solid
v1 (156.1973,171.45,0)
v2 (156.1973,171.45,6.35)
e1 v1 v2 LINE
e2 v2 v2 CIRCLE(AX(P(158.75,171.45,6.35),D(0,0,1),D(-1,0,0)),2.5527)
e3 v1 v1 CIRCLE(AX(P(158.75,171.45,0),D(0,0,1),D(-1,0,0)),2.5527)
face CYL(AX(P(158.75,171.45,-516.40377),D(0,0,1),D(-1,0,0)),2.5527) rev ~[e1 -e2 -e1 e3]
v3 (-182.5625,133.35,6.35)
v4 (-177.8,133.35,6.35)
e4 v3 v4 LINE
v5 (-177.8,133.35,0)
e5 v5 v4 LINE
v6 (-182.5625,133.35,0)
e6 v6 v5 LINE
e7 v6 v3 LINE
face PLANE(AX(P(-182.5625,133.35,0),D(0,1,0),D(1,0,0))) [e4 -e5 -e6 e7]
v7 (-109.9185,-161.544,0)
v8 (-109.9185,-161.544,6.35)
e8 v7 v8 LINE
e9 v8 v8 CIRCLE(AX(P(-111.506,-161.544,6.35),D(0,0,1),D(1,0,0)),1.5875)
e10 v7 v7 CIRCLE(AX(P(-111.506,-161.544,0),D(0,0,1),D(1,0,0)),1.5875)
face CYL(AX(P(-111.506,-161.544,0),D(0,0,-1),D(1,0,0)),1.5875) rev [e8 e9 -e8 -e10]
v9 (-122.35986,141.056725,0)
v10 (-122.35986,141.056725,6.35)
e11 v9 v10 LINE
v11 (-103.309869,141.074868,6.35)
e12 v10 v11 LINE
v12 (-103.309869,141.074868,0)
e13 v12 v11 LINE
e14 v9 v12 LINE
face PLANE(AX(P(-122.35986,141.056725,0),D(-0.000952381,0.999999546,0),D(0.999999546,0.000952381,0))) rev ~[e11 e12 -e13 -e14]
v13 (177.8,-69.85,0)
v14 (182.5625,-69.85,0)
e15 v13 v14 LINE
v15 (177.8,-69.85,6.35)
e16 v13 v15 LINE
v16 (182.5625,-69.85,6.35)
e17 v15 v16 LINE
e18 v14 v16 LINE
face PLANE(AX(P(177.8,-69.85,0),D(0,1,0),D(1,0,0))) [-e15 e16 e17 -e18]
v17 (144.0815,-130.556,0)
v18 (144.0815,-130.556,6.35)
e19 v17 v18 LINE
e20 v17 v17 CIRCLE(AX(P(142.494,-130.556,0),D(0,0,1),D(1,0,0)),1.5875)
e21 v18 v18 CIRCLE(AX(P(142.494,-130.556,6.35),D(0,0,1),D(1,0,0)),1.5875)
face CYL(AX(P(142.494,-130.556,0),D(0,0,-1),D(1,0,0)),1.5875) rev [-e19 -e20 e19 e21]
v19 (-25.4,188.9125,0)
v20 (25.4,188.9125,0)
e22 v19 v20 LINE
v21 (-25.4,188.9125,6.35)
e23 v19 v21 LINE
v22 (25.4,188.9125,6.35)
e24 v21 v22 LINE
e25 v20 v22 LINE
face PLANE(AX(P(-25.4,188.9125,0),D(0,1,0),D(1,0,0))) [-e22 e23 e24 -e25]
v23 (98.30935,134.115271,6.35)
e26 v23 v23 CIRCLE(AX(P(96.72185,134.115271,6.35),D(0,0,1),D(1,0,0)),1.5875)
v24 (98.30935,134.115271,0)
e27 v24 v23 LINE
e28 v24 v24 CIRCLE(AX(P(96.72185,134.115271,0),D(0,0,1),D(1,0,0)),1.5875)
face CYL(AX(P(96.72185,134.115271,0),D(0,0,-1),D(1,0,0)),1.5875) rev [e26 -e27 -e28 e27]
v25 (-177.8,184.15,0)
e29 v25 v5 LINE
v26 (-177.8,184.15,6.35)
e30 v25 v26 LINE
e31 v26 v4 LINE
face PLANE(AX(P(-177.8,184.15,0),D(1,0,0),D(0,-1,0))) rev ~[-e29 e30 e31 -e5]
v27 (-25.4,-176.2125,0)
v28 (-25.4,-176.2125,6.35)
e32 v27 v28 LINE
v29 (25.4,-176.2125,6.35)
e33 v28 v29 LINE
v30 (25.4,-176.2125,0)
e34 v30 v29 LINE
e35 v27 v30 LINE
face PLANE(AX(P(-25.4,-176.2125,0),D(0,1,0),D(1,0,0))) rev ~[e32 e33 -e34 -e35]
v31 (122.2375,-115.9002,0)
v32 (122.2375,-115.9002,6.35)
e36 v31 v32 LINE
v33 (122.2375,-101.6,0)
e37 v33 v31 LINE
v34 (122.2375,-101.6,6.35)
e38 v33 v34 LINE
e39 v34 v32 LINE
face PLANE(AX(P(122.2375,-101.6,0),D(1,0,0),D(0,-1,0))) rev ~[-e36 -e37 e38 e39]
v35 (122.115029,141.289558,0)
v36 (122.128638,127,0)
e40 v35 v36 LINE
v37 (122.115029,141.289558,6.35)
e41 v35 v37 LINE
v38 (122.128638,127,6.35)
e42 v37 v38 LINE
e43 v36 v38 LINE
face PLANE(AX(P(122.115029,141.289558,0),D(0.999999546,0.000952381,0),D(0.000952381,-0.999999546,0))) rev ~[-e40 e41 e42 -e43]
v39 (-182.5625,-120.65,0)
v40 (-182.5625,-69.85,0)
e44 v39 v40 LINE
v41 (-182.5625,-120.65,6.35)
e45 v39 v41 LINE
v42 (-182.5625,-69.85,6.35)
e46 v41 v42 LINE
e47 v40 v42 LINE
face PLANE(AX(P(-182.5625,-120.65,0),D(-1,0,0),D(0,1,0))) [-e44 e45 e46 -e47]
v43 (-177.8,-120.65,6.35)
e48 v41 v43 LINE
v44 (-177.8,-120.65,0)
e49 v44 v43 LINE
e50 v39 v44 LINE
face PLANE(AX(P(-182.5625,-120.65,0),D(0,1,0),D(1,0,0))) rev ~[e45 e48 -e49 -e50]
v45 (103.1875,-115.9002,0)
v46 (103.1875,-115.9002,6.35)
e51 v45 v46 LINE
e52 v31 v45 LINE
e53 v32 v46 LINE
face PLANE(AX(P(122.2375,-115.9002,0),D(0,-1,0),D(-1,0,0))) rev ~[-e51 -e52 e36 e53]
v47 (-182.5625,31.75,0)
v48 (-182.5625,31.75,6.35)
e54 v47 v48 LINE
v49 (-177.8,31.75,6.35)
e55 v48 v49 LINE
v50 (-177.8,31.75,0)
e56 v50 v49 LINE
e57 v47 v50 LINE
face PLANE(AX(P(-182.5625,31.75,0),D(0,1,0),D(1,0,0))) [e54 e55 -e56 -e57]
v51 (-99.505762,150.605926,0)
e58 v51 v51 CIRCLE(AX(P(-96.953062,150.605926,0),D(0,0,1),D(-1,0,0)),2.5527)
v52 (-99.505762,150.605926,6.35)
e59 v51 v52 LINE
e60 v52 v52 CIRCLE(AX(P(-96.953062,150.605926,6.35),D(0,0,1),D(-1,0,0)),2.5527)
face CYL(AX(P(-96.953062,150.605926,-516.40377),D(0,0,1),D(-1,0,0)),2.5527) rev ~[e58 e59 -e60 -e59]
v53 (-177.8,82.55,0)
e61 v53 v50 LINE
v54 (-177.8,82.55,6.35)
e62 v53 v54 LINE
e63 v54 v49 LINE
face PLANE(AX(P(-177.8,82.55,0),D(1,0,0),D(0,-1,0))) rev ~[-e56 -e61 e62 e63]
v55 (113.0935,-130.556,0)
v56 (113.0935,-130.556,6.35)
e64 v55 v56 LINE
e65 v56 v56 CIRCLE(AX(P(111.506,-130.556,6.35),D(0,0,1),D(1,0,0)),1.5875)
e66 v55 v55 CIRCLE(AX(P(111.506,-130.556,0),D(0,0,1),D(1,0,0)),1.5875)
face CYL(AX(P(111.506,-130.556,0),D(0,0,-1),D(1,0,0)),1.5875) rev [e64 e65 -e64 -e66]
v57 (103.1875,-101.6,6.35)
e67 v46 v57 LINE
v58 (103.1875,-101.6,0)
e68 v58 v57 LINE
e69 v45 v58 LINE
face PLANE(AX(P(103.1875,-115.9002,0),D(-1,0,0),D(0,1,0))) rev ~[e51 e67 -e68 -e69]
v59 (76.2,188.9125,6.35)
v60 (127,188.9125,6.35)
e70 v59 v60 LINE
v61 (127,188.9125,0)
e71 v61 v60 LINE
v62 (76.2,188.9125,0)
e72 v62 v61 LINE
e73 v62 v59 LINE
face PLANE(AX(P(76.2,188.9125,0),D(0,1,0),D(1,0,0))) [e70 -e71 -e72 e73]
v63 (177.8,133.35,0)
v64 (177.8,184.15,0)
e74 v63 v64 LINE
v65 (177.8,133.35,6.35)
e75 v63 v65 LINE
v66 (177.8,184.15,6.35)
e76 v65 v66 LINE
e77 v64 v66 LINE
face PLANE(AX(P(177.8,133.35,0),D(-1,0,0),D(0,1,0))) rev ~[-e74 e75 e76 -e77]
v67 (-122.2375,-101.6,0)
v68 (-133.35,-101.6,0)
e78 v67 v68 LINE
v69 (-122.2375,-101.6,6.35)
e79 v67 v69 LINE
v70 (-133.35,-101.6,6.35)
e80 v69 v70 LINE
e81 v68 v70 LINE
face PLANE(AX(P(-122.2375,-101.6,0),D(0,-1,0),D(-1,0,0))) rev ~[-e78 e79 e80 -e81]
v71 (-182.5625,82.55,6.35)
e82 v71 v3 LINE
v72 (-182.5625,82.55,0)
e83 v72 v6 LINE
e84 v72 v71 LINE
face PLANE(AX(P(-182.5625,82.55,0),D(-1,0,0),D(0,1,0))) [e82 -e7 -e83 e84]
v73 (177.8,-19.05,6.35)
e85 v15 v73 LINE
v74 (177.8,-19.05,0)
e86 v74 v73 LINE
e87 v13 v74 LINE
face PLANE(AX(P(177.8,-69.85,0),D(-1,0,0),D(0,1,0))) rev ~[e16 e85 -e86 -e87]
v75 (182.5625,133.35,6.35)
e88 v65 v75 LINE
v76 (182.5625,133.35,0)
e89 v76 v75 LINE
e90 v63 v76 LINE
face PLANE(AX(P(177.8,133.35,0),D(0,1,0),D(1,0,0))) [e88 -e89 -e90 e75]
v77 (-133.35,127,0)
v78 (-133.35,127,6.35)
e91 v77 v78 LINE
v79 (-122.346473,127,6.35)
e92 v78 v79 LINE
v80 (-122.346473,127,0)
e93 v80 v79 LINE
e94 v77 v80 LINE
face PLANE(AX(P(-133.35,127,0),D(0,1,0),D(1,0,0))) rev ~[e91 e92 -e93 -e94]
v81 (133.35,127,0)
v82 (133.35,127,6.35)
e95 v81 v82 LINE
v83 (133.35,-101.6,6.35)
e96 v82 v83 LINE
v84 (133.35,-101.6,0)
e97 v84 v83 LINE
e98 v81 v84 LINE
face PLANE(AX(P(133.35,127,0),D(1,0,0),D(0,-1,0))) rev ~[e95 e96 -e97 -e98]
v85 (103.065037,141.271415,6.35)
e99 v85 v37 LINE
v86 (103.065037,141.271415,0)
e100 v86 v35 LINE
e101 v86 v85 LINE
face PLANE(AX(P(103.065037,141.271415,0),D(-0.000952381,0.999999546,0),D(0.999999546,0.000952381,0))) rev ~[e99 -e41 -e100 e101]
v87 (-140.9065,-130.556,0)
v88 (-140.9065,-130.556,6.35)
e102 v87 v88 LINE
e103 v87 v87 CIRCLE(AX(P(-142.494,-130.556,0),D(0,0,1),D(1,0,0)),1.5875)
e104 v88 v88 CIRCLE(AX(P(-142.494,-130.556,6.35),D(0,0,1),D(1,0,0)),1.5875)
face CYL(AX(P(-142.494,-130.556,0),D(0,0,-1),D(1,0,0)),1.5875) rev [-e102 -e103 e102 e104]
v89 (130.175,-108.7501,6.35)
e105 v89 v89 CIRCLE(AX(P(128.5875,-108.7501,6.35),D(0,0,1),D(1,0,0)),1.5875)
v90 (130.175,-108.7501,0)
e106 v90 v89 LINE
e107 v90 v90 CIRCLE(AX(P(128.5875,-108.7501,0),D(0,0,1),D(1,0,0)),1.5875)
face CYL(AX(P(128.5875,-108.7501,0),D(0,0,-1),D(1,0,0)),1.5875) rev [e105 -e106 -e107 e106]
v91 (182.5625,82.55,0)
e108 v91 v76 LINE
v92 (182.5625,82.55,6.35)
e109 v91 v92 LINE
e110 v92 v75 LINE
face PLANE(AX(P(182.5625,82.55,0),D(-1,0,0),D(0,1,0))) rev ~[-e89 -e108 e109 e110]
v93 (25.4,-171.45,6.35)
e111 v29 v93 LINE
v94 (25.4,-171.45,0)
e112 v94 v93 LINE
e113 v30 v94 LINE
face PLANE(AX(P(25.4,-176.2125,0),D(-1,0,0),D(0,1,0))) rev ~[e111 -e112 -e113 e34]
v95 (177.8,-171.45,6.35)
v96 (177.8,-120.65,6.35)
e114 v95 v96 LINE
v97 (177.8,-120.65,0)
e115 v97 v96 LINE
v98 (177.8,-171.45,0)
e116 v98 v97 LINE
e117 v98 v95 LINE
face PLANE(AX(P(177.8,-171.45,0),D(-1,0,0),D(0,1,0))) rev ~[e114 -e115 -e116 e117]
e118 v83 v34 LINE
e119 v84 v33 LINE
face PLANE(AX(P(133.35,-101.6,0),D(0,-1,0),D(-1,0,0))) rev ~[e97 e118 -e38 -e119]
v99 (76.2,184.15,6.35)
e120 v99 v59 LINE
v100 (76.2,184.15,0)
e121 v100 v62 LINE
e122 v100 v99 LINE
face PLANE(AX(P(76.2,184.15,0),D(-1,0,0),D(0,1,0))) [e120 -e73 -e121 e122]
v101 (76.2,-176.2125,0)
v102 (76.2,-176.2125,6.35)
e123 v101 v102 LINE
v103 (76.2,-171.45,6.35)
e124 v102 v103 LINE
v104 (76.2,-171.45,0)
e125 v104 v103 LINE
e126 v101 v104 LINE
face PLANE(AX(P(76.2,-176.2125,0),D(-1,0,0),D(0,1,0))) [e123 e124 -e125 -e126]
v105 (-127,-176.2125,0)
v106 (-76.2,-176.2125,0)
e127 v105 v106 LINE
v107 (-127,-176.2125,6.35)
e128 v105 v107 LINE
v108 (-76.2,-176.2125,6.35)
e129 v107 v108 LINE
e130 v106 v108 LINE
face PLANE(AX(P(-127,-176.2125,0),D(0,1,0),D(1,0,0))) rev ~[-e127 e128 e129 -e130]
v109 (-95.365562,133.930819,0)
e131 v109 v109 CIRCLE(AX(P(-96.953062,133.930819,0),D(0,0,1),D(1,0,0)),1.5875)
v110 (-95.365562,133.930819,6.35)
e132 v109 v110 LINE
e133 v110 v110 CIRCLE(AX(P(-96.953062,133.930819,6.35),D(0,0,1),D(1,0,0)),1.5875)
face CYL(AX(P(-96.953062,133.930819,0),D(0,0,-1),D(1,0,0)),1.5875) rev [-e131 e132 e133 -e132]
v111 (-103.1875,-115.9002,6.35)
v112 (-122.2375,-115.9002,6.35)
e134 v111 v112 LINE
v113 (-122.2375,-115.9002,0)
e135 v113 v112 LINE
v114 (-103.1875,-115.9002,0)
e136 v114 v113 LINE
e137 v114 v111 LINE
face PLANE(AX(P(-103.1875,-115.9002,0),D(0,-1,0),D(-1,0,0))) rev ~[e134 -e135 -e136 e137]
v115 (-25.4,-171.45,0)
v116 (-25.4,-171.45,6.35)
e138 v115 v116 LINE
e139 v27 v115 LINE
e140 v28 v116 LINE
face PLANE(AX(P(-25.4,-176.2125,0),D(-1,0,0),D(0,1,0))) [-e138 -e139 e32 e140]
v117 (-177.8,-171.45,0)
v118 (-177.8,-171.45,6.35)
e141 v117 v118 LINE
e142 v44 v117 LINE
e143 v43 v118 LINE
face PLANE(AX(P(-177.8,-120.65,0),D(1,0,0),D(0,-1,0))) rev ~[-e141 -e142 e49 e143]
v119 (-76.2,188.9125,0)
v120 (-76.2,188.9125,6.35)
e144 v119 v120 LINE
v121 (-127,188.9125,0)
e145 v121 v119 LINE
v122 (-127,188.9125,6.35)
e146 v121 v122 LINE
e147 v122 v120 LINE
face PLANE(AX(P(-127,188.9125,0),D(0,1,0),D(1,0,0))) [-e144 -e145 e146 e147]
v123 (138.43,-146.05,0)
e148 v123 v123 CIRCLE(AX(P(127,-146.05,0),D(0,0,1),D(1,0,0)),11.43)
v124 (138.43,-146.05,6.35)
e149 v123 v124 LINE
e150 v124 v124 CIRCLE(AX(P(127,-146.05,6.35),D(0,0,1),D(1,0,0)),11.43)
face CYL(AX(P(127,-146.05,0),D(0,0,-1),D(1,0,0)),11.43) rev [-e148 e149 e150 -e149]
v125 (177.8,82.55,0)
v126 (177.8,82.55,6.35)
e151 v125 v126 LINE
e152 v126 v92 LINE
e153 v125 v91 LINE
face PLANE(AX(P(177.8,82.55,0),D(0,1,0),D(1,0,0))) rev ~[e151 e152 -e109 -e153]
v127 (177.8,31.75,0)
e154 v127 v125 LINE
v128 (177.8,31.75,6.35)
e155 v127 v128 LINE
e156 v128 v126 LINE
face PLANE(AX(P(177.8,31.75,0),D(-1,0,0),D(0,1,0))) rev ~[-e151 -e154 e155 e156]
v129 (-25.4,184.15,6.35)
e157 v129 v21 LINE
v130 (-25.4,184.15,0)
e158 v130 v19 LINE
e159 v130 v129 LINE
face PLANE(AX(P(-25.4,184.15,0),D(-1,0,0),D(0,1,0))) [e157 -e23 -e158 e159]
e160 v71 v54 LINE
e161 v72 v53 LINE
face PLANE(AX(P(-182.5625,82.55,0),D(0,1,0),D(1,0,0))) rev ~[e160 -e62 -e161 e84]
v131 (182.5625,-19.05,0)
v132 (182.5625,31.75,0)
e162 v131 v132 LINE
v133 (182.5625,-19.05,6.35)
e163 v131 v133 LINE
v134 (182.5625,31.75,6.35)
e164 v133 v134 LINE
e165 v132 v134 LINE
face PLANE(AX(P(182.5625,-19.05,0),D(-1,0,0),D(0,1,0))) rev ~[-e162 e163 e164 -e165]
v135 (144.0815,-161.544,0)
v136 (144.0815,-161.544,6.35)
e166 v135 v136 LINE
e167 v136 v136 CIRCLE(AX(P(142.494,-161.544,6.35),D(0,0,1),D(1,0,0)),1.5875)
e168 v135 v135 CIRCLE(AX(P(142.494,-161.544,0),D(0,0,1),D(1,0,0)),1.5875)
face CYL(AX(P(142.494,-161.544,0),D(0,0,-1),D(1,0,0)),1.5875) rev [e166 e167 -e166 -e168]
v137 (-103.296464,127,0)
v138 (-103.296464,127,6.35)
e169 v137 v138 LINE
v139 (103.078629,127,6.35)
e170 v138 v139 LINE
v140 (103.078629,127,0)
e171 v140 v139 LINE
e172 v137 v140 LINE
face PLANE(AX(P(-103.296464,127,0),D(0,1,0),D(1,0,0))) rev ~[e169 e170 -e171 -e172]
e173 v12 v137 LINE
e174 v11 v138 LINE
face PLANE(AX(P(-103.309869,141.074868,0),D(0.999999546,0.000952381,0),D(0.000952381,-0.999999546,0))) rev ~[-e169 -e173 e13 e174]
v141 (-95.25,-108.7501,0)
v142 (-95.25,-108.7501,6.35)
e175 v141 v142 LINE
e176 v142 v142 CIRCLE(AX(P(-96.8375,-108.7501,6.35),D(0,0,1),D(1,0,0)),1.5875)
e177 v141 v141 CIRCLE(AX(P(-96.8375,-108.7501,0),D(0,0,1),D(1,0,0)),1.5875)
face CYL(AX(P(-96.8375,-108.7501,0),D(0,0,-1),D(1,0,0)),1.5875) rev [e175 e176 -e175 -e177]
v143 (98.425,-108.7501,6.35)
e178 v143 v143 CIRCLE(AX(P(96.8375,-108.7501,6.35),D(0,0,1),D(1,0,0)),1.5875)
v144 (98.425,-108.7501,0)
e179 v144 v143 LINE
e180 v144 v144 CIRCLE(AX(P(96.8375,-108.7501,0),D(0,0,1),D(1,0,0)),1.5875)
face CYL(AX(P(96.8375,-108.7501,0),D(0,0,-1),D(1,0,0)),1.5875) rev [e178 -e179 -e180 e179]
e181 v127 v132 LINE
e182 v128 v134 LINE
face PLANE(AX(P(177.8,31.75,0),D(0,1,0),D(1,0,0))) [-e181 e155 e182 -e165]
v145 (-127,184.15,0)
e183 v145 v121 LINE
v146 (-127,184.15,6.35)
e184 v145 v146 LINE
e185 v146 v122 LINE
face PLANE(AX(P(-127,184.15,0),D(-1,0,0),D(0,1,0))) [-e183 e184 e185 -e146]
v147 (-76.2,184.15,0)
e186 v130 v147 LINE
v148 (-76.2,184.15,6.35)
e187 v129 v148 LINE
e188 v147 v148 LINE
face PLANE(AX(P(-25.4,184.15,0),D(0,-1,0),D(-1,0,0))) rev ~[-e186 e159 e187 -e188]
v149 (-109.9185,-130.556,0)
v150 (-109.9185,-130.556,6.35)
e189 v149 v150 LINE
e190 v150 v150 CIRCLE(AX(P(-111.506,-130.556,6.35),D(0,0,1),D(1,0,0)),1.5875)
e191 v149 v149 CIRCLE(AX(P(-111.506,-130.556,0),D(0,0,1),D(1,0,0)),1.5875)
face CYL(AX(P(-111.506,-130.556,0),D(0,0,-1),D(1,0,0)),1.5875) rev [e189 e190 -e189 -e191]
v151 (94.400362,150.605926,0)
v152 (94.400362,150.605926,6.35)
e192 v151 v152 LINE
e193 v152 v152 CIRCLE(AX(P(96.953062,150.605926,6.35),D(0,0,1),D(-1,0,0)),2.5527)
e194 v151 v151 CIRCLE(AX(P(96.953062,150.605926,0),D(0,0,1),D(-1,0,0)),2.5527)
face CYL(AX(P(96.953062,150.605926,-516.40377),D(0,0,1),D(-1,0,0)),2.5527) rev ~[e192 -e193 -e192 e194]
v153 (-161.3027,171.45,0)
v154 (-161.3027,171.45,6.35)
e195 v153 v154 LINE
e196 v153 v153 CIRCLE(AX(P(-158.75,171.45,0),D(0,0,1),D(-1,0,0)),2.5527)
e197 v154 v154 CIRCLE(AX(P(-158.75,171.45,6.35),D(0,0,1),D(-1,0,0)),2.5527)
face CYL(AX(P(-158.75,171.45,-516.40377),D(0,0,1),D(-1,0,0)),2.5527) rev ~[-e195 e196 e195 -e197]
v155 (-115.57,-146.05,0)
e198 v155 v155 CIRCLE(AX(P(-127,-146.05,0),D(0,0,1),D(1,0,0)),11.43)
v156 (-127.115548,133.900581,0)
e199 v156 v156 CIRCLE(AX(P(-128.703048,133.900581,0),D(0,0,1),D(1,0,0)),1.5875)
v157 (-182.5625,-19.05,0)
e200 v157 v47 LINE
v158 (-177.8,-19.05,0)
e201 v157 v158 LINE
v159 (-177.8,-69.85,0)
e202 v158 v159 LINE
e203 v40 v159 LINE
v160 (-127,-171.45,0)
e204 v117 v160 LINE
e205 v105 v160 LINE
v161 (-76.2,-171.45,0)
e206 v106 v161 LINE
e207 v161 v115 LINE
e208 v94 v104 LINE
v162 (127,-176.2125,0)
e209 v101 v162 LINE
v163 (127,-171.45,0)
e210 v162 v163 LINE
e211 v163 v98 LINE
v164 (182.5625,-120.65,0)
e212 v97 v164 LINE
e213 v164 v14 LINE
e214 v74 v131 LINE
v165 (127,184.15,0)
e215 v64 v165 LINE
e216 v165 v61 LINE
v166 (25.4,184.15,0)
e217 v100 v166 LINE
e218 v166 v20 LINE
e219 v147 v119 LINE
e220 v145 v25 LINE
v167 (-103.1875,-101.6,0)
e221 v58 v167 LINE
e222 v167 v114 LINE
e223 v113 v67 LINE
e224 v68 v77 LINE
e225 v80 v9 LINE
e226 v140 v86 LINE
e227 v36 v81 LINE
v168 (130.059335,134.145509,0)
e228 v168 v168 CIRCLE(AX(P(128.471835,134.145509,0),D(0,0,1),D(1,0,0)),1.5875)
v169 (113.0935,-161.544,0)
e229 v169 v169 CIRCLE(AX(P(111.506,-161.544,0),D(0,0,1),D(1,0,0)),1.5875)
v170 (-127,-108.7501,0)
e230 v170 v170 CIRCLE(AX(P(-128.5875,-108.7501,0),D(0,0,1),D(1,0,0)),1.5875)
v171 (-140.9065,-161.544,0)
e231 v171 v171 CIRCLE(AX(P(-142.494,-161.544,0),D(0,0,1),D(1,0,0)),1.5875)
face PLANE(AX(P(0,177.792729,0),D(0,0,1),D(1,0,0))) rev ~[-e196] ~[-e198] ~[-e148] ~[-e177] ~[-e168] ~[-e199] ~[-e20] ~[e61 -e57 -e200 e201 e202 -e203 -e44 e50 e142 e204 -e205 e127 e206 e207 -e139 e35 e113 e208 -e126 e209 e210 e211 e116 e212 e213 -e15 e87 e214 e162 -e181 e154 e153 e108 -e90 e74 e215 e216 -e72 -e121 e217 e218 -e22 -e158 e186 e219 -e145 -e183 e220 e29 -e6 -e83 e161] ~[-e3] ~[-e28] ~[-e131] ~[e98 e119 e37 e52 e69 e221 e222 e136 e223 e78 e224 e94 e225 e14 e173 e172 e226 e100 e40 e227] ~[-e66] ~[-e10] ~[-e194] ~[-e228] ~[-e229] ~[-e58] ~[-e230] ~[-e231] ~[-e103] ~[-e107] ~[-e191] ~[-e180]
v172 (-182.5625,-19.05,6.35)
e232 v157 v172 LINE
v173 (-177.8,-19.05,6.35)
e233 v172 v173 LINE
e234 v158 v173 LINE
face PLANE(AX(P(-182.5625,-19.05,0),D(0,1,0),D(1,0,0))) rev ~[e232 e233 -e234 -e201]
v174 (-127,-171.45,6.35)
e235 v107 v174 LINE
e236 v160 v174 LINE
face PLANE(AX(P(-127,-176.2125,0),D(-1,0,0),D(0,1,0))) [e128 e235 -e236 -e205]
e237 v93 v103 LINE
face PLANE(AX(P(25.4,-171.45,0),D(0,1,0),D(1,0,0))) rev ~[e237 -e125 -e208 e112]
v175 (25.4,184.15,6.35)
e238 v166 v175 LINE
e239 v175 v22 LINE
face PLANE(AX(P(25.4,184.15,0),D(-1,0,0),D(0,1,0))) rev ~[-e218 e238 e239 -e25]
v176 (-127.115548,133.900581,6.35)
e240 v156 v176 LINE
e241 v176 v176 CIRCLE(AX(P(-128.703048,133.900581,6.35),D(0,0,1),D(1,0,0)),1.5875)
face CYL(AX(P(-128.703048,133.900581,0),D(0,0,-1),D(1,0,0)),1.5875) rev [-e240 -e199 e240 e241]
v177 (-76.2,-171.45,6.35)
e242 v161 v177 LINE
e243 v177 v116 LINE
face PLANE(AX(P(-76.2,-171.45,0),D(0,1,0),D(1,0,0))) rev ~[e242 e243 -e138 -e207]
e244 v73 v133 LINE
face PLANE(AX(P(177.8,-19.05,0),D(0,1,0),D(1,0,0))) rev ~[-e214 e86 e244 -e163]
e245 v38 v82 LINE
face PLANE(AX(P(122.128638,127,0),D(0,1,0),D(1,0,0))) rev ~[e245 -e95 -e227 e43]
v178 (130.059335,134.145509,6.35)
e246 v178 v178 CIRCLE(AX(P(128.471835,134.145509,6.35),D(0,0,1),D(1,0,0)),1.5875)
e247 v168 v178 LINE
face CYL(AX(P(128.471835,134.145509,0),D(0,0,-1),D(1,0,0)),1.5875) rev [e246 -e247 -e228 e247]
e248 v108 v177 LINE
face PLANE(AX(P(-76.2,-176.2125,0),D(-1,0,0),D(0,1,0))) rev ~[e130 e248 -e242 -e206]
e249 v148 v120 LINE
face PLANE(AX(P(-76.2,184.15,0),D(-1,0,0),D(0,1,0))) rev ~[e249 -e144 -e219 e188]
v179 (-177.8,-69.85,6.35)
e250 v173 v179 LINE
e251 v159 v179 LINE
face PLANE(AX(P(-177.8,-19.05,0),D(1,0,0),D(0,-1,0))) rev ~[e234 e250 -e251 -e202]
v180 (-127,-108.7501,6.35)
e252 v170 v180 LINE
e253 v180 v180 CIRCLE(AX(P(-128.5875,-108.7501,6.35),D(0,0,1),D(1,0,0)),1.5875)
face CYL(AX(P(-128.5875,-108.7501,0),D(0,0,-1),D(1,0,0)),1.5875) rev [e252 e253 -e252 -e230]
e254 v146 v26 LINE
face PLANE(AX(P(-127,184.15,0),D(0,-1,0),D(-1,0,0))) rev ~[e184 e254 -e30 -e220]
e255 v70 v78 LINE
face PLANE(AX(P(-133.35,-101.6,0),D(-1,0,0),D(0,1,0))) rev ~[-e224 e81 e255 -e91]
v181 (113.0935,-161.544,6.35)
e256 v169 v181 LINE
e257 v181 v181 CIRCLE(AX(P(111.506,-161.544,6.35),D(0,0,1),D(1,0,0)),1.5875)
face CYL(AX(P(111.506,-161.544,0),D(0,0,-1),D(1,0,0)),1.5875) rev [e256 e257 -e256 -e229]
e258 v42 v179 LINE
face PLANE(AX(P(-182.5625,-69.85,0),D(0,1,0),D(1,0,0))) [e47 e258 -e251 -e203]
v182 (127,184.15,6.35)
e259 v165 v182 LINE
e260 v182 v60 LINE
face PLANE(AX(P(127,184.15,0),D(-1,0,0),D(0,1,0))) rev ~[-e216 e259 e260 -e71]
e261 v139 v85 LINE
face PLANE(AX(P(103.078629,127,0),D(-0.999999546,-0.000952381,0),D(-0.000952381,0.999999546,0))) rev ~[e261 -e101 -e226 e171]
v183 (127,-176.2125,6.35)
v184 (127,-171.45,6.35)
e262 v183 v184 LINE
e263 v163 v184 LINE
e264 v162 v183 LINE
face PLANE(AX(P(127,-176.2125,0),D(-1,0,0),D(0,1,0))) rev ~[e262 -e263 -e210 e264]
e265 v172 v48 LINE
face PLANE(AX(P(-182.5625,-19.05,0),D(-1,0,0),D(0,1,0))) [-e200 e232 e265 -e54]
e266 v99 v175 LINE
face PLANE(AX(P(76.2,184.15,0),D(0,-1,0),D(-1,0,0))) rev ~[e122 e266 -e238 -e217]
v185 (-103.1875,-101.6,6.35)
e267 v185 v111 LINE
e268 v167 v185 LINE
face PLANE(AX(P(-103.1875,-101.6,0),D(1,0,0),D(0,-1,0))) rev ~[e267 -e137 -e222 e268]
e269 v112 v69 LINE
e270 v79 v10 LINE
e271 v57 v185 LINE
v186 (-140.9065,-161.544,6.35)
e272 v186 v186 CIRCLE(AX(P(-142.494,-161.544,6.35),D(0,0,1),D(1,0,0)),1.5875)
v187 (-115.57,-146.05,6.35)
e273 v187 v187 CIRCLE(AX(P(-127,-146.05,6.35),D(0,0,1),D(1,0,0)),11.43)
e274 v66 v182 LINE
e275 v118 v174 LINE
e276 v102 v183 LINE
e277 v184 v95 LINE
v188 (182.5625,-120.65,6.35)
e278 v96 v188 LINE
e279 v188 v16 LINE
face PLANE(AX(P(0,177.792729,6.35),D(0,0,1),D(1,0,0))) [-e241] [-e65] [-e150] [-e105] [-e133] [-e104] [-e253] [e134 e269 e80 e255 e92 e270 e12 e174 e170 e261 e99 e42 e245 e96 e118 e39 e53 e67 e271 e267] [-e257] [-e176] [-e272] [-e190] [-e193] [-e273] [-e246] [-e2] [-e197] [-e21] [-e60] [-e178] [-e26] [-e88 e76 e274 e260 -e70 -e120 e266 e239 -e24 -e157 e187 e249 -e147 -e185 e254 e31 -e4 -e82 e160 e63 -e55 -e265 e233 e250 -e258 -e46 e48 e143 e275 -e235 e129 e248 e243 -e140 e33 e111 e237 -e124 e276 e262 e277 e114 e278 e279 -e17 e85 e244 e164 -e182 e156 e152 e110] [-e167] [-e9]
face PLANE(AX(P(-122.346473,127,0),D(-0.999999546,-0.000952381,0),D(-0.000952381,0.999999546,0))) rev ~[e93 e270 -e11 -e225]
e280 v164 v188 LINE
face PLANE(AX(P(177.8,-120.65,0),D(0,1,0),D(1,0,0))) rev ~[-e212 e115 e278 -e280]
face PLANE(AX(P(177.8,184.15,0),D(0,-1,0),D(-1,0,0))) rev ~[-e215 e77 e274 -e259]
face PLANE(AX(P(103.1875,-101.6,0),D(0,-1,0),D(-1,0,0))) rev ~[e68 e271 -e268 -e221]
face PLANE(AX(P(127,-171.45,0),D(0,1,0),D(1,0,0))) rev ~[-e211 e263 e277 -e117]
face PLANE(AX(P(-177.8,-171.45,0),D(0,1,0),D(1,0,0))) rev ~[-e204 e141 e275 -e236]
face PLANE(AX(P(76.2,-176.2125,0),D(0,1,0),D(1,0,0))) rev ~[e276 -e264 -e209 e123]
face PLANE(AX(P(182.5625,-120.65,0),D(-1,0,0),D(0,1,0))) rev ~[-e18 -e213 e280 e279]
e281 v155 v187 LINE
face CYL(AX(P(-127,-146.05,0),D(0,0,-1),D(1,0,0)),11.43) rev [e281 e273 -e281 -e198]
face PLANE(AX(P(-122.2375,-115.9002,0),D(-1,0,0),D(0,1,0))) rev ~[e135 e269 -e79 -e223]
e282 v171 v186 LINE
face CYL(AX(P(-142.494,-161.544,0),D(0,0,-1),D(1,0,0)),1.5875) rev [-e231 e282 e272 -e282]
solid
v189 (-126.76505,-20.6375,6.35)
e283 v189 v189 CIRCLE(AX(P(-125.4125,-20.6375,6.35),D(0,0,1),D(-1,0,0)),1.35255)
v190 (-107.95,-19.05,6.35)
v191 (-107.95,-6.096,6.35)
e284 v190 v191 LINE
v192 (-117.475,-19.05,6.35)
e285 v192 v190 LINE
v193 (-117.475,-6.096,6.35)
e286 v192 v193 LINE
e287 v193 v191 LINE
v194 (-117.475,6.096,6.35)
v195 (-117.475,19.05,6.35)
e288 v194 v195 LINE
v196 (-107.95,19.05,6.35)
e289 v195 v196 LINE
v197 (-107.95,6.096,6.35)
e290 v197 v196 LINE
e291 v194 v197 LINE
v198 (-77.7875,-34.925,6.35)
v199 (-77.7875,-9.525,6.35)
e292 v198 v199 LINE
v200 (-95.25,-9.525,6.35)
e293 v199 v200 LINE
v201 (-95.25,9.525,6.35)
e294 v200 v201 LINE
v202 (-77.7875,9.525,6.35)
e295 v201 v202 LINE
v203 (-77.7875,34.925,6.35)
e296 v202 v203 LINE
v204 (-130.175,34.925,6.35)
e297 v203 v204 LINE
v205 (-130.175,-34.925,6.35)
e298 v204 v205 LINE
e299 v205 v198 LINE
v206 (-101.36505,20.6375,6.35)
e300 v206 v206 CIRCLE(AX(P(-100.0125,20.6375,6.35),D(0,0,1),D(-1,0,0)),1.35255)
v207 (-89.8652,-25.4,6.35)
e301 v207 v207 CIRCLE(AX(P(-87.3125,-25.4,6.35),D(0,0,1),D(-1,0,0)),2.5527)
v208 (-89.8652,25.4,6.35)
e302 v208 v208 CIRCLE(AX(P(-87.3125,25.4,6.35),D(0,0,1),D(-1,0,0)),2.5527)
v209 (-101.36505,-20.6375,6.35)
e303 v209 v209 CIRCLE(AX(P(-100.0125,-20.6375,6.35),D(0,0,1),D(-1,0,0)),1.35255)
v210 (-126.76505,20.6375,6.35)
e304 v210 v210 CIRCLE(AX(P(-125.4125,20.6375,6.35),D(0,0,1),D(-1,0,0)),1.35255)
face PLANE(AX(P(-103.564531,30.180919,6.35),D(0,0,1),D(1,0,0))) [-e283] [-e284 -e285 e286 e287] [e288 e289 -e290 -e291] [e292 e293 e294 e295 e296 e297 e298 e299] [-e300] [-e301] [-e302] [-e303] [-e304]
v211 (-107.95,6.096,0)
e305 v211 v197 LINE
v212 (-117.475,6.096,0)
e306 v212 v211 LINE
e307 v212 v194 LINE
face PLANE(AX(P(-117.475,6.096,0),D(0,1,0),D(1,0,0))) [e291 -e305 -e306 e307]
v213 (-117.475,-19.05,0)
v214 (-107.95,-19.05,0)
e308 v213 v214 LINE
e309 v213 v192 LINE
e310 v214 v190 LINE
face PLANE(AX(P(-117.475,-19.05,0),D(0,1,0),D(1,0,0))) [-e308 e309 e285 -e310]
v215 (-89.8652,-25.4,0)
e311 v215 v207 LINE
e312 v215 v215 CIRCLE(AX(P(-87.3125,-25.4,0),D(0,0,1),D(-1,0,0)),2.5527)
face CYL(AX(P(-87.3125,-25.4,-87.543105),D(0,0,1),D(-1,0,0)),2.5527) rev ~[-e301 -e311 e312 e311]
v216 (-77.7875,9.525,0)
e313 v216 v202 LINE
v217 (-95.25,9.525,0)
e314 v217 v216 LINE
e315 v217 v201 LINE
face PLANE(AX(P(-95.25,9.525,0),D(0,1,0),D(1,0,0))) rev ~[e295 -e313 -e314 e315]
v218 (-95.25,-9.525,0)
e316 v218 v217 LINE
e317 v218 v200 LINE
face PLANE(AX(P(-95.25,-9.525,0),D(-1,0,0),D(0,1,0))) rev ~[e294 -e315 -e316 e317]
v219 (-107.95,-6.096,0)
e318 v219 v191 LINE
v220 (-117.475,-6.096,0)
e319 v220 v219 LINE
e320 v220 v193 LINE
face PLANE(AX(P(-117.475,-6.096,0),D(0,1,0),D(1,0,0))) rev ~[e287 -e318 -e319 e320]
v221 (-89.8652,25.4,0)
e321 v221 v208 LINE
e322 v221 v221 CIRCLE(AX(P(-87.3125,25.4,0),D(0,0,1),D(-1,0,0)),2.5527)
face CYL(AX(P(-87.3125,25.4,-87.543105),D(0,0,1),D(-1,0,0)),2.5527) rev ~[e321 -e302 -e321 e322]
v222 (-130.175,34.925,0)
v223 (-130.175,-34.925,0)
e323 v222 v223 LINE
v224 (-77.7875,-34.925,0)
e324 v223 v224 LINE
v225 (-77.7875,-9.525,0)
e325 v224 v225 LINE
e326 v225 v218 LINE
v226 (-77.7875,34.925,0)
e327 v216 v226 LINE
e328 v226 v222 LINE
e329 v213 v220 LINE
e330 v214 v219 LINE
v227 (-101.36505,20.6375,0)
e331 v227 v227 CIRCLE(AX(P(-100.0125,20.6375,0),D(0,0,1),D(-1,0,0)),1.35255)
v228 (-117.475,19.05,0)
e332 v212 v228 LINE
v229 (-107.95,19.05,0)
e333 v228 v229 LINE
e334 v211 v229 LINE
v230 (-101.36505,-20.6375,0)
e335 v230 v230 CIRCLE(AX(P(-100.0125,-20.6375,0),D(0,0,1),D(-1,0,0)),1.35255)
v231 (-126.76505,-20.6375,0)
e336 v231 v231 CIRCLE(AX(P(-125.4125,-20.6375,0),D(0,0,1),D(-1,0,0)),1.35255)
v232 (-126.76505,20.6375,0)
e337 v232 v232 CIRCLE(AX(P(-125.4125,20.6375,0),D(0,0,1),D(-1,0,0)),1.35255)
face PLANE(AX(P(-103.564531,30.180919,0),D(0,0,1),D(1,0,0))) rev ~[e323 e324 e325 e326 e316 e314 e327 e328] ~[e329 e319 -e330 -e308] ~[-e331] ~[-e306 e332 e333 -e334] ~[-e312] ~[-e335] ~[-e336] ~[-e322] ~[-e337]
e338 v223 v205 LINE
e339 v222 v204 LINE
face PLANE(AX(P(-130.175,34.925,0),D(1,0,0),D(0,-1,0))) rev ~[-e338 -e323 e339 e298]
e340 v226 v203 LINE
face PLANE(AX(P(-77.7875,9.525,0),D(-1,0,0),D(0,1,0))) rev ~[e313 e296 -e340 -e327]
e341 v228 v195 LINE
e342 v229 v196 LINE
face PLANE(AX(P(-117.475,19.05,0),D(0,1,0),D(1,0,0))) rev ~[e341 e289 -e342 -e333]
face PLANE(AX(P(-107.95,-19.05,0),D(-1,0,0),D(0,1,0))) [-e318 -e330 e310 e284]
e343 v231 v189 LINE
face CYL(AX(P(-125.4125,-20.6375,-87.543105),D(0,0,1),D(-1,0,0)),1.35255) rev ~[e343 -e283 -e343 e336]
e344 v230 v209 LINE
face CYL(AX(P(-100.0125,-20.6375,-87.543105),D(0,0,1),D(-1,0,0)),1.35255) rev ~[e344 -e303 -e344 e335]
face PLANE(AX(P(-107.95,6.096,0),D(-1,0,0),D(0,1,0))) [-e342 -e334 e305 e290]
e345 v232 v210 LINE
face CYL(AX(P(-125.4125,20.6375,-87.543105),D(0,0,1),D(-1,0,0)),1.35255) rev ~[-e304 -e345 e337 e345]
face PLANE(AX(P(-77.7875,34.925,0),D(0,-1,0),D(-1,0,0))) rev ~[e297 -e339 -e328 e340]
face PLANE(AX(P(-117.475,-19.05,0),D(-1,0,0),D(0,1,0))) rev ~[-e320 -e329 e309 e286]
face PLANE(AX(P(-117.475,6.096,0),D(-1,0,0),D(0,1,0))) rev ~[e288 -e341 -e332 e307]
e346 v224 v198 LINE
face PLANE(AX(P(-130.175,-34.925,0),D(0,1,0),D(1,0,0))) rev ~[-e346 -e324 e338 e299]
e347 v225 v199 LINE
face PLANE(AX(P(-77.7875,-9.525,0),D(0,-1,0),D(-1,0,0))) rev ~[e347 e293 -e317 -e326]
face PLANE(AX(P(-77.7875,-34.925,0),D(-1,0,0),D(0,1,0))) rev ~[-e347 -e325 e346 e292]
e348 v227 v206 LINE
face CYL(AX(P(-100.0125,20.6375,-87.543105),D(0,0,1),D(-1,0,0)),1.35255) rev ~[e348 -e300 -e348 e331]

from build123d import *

# Parameters (mm, degrees)
F0_R     = 1.5875
F0_R_2   = 11.43
F0_R_3   = 3.175
F0_W     = 4.7625
F0_H     = 50.8
F0_W_2   = 50.8
F0_H_2   = 4.7625
F0_W_3   = 44.45
F0_H_3   = 41.1268851364
F1_DEPTH = 6.35
F0_R_4   = 1.8415
F0_W_4   = 9.525
F0_H_4   = 12.954
F2_D     = 2.7051
F3_D     = 5.1054
F4_D     = 5.1054


with BuildPart() as f1:
    # F0 (on Top) → F1 (new body)
    with BuildSketch(Plane.XY):
        with BuildLine():
            ThreePointArc((155.575, 171.45), (158.75, 174.625), (161.925, 171.45))
            Line((161.925, 171.45), (177.8, 171.45))
            Line((177.8, 171.45), (177.8, 184.15))
            Line((177.8, 184.15), (127, 184.15))
            Line((127, 184.15), (76.2, 184.15))
            Line((76.2, 184.15), (25.4, 184.15))
            Line((25.4, 184.15), (-25.4, 184.15))
            Line((-25.4, 184.15), (-76.2, 184.15))
            Line((-76.2, 184.15), (-127, 184.15))
            Line((-127, 184.15), (-177.8, 184.15))
            Line((-177.8, 184.15), (-177.8, 171.45))
            Line((-177.8, 171.45), (-161.925, 171.45))
            ThreePointArc((-161.925, 171.45), (-158.75, 174.625), (-155.575, 171.45))
            Line((-155.575, 171.45), (155.575, 171.45))
        make_face()
        with BuildLine():
            ThreePointArc((155.575, 171.45), (158.75, 168.275), (161.925, 171.45))
            Line((161.925, 171.45), (155.575, 171.45))
        make_face()
        with BuildLine():
            Line((155.575, 171.45), (161.925, 171.45))
            ThreePointArc((161.925, 171.45), (158.75, 174.625), (155.575, 171.45))
        make_face()
        with BuildLine():
            Line((177.8, 171.45), (161.925, 171.45))
            ThreePointArc((161.925, 171.45), (158.75, 168.275), (155.575, 171.45))
            Line((155.575, 171.45), (-155.575, 171.45))
            ThreePointArc((-155.575, 171.45), (-158.75, 168.275), (-161.925, 171.45))
            Line((-161.925, 171.45), (-177.8, 171.45))
            Line((-177.8, 171.45), (-177.8, 133.35))
            Line((-177.8, 133.35), (-177.8, 82.55))
            Line((-177.8, 82.55), (-177.8, 31.75))
            Line((-177.8, 31.75), (-177.8, -19.05))
            Line((-177.8, -19.05), (-177.8, -69.85))
            Line((-177.8, -69.85), (-177.8, -120.65))
            Line((-177.8, -120.65), (-177.8, -171.45))
            Line((-177.8, -171.45), (-127, -171.45))
            Line((-127, -171.45), (-76.2, -171.45))
            Line((-76.2, -171.45), (-25.4, -171.45))
            Line((-25.4, -171.45), (25.4, -171.45))
            Line((25.4, -171.45), (76.2, -171.45))
            Line((76.2, -171.45), (127, -171.45))
            Line((127, -171.45), (177.8, -171.45))
            Line((177.8, -171.45), (177.8, -120.65))
            Line((177.8, -120.65), (177.8, -69.85))
            Line((177.8, -69.85), (177.8, -19.05))
            Line((177.8, -19.05), (177.8, 31.75))
            Line((177.8, 31.75), (177.8, 82.55))
            Line((177.8, 82.55), (177.8, 133.35))
            Line((177.8, 133.35), (177.8, 171.45))
        make_face()
        with Locations((-142.494, -161.544)):
            Circle(F0_R, mode=Mode.SUBTRACT)
        with Locations((-111.506, -161.544)):
            Circle(F0_R, mode=Mode.SUBTRACT)
        with Locations((-127, -146.05)):
            Circle(F0_R_2, mode=Mode.SUBTRACT)
        with Locations((-142.494, -130.556)):
            Circle(F0_R, mode=Mode.SUBTRACT)
        with Locations((-128.5875, -108.7501)):
            Circle(F0_R, mode=Mode.SUBTRACT)
        with Locations((-111.506, -130.556)):
            Circle(F0_R, mode=Mode.SUBTRACT)
        with Locations((-96.8375, -108.7501)):
            Circle(F0_R, mode=Mode.SUBTRACT)
        with Locations((111.506, -161.544)):
            Circle(F0_R, mode=Mode.SUBTRACT)
        with Locations((127, -146.05)):
            Circle(F0_R_2, mode=Mode.SUBTRACT)
        with Locations((142.494, -161.544)):
            Circle(F0_R, mode=Mode.SUBTRACT)
        with Locations((111.506, -130.556)):
            Circle(F0_R, mode=Mode.SUBTRACT)
        with Locations((96.8375, -108.7501)):
            Circle(F0_R, mode=Mode.SUBTRACT)
        with Locations((128.5875, -108.7501)):
            Circle(F0_R, mode=Mode.SUBTRACT)
        with Locations((142.494, -130.556)):
            Circle(F0_R, mode=Mode.SUBTRACT)
        with Locations((-128.7030479432, 133.9005806915)):
            Circle(F0_R, mode=Mode.SUBTRACT)
        with Locations((-96.9530623423, 133.9308187798)):
            Circle(F0_R, mode=Mode.SUBTRACT)
        with Locations((-96.9530623423, 150.6059263422)):
            Circle(F0_R_3, mode=Mode.SUBTRACT)
        Polygon((-122.2375, -101.6), (-133.35, -101.6), (-133.35, 126.7460517791), (-133.35, 127), (-122.3464730803, 127), (-122.3598604405, 141.0567250665), (-103.30986908, 141.0748679195), (-103.2964644408, 127), (-22.225, 127), (-22.225, 168.1268851364), (22.225, 168.1268851364), (22.225, 127), (103.0786291533, 127), (103.065037326, 141.271415494), (122.1150286865, 141.289558347), (122.1286377928, 127), (133.2411428818, 127), (133.35, 127), (133.35, -101.6), (122.2375, -101.6), (122.2375, -115.9002), (103.1875, -115.9002), (103.1875, -101.6), (-103.1875, -101.6), (-103.1875, -115.9002), (-122.2375, -115.9002), align=None, mode=Mode.SUBTRACT)
        with Locations((96.7218498233, 134.115271119)):
            Circle(F0_R, mode=Mode.SUBTRACT)
        with Locations((128.4718354242, 134.1455092073)):
            Circle(F0_R, mode=Mode.SUBTRACT)
        with Locations((96.9530623423, 150.6059263422)):
            Circle(F0_R_3, mode=Mode.SUBTRACT)
        with Locations((180.18125, 107.95)):
            Rectangle(F0_W, F0_H)
        with BuildLine():
            ThreePointArc((-161.925, 171.45), (-158.75, 168.275), (-155.575, 171.45))
            Line((-155.575, 171.45), (-161.925, 171.45))
        make_face()
        with BuildLine():
            Line((-161.925, 171.45), (-155.575, 171.45))
            ThreePointArc((-155.575, 171.45), (-158.75, 174.625), (-161.925, 171.45))
        make_face()
        with Locations((101.6, 186.53125)):
            Rectangle(F0_W_2, F0_H_2)
        with Locations((180.18125, 6.35)):
            Rectangle(F0_W, F0_H)
        with Locations((0, 186.53125)):
            Rectangle(F0_W_2, F0_H_2)
        with Locations((-180.18125, 107.95)):
            Rectangle(F0_W, F0_H)
        with Locations((180.18125, -95.25)):
            Rectangle(F0_W, F0_H)
        with Locations((-101.6, 186.53125)):
            Rectangle(F0_W_2, F0_H_2)
        with Locations((-180.18125, 6.35)):
            Rectangle(F0_W, F0_H)
        with Locations((101.6, -173.83125)):
            Rectangle(F0_W_2, F0_H_2)
        with Locations((-180.18125, -95.25)):
            Rectangle(F0_W, F0_H)
        with Locations((0, -173.83125)):
            Rectangle(F0_W_2, F0_H_2)
        with Locations((-101.6, -173.83125)):
            Rectangle(F0_W_2, F0_H_2)
        with Locations((0, 147.5634425682)):
            Rectangle(F0_W_3, F0_H_3)
        with Locations((-96.9530623423, 150.6059263422)):
            Circle(F0_R_3)
        with Locations((96.9530623423, 150.6059263422)):
            Circle(F0_R_3)
    extrude(amount=F1_DEPTH)

    # F4 (through all)
    with Locations(Plane(origin=(0, 0, 0), x_dir=(1, 0, 0), z_dir=(0, 0, -1))):
        with Locations((-158.75, -171.45), (-96.9530623423, -150.6059263422), (96.9530623423, -150.6059263422), (158.75, -171.45)):
            Hole(F4_D / 2)


with BuildPart() as f1b:
    # F0 (on Top) → F1, piece 2 (new body)
    with BuildSketch(Plane.XY):
        with BuildLine():
            Line((-130.175, 34.925), (-130.175, 25.4))
            Line((-130.175, 25.4), (-95.25, 25.4))
            Line((-95.25, 25.4), (-90.4875, 25.4))
            ThreePointArc((-90.4875, 25.4), (-87.3125, 28.575), (-84.1375, 25.4))
            Line((-84.1375, 25.4), (-77.7875, 25.4))
            Line((-77.7875, 25.4), (-77.7875, 34.925))
            Line((-77.7875, 34.925), (-100.0125, 34.925))
            Line((-100.0125, 34.925), (-130.175, 34.925))
        make_face()
        Polygon((-95.25, 25.4), (-130.175, 25.4), (-130.175, -25.4), (-95.25, -25.4), (-95.25, -9.525), (-95.25, 9.525), align=None)
        with Locations((-125.4125, -20.6375)):
            Circle(F0_R_4, mode=Mode.SUBTRACT)
        with Locations((-100.0125, -20.6375)):
            Circle(F0_R_4, mode=Mode.SUBTRACT)
        with Locations((-112.7125, -12.573)):
            Rectangle(F0_W_4, F0_H_4, mode=Mode.SUBTRACT)
        with Locations((-125.4125, 20.6375)):
            Circle(F0_R_4, mode=Mode.SUBTRACT)
        with Locations((-112.7125, 12.573)):
            Rectangle(F0_W_4, F0_H_4, mode=Mode.SUBTRACT)
        with Locations((-100.0125, 20.6375)):
            Circle(F0_R_4, mode=Mode.SUBTRACT)
        with BuildLine():
            Line((-90.4875, 25.4), (-95.25, 25.4))
            Line((-95.25, 25.4), (-95.25, 9.525))
            Line((-95.25, 9.525), (-77.7875, 9.525))
            Line((-77.7875, 9.525), (-77.7875, 25.4))
            Line((-77.7875, 25.4), (-84.1375, 25.4))
            ThreePointArc((-84.1375, 25.4), (-87.3125, 22.225), (-90.4875, 25.4))
        make_face()
        with BuildLine():
            Line((-95.25, -25.4), (-130.175, -25.4))
            Line((-130.175, -25.4), (-130.175, -34.925))
            Line((-130.175, -34.925), (-100.0125, -34.925))
            Line((-100.0125, -34.925), (-77.7875, -34.925))
            Line((-77.7875, -34.925), (-77.7875, -25.4))
            Line((-77.7875, -25.4), (-84.1375, -25.4))
            ThreePointArc((-84.1375, -25.4), (-87.3125, -28.575), (-90.4875, -25.4))
            Line((-90.4875, -25.4), (-95.25, -25.4))
        make_face()
        with BuildLine():
            ThreePointArc((-84.1375, 25.4), (-87.3125, 28.575), (-90.4875, 25.4))
            Line((-90.4875, 25.4), (-84.1375, 25.4))
        make_face()
        with BuildLine():
            Line((-84.1375, 25.4), (-90.4875, 25.4))
            ThreePointArc((-90.4875, 25.4), (-87.3125, 22.225), (-84.1375, 25.4))
        make_face()
        with BuildLine():
            Line((-95.25, -9.525), (-95.25, -25.4))
            Line((-95.25, -25.4), (-90.4875, -25.4))
            ThreePointArc((-90.4875, -25.4), (-87.3125, -22.225), (-84.1375, -25.4))
            Line((-84.1375, -25.4), (-77.7875, -25.4))
            Line((-77.7875, -25.4), (-77.7875, -9.525))
            Line((-77.7875, -9.525), (-95.25, -9.525))
        make_face()
        with BuildLine():
            ThreePointArc((-84.1375, -25.4), (-87.3125, -22.225), (-90.4875, -25.4))
            Line((-90.4875, -25.4), (-84.1375, -25.4))
        make_face()
        with BuildLine():
            Line((-84.1375, -25.4), (-90.4875, -25.4))
            ThreePointArc((-90.4875, -25.4), (-87.3125, -28.575), (-84.1375, -25.4))
        make_face()
        with Locations((-125.4125, 20.6375)):
            Circle(F0_R_4)
        with Locations((-100.0125, 20.6375)):
            Circle(F0_R_4)
        with Locations((-125.4125, -20.6375)):
            Circle(F0_R_4)
        with Locations((-100.0125, -20.6375)):
            Circle(F0_R_4)
    extrude(amount=F1_DEPTH)

    # F2 (through all)
    with Locations(Plane(origin=(0, 0, 0), x_dir=(1, 0, 0), z_dir=(0, 0, -1))):
        with Locations((-125.4125, -20.6375), (-100.0125, -20.6375), (-100.0125, 20.6375), (-125.4125, 20.6375)):
            Hole(F2_D / 2)

    # F3 (through all)
    with Locations(Plane(origin=(0, 0, 0), x_dir=(1, 0, 0), z_dir=(0, 0, -1))):
        with Locations((-87.3125, -25.4), (-87.3125, 25.4)):
            Hole(F3_D / 2)


solid = Compound([f1.part, f1b.part])
